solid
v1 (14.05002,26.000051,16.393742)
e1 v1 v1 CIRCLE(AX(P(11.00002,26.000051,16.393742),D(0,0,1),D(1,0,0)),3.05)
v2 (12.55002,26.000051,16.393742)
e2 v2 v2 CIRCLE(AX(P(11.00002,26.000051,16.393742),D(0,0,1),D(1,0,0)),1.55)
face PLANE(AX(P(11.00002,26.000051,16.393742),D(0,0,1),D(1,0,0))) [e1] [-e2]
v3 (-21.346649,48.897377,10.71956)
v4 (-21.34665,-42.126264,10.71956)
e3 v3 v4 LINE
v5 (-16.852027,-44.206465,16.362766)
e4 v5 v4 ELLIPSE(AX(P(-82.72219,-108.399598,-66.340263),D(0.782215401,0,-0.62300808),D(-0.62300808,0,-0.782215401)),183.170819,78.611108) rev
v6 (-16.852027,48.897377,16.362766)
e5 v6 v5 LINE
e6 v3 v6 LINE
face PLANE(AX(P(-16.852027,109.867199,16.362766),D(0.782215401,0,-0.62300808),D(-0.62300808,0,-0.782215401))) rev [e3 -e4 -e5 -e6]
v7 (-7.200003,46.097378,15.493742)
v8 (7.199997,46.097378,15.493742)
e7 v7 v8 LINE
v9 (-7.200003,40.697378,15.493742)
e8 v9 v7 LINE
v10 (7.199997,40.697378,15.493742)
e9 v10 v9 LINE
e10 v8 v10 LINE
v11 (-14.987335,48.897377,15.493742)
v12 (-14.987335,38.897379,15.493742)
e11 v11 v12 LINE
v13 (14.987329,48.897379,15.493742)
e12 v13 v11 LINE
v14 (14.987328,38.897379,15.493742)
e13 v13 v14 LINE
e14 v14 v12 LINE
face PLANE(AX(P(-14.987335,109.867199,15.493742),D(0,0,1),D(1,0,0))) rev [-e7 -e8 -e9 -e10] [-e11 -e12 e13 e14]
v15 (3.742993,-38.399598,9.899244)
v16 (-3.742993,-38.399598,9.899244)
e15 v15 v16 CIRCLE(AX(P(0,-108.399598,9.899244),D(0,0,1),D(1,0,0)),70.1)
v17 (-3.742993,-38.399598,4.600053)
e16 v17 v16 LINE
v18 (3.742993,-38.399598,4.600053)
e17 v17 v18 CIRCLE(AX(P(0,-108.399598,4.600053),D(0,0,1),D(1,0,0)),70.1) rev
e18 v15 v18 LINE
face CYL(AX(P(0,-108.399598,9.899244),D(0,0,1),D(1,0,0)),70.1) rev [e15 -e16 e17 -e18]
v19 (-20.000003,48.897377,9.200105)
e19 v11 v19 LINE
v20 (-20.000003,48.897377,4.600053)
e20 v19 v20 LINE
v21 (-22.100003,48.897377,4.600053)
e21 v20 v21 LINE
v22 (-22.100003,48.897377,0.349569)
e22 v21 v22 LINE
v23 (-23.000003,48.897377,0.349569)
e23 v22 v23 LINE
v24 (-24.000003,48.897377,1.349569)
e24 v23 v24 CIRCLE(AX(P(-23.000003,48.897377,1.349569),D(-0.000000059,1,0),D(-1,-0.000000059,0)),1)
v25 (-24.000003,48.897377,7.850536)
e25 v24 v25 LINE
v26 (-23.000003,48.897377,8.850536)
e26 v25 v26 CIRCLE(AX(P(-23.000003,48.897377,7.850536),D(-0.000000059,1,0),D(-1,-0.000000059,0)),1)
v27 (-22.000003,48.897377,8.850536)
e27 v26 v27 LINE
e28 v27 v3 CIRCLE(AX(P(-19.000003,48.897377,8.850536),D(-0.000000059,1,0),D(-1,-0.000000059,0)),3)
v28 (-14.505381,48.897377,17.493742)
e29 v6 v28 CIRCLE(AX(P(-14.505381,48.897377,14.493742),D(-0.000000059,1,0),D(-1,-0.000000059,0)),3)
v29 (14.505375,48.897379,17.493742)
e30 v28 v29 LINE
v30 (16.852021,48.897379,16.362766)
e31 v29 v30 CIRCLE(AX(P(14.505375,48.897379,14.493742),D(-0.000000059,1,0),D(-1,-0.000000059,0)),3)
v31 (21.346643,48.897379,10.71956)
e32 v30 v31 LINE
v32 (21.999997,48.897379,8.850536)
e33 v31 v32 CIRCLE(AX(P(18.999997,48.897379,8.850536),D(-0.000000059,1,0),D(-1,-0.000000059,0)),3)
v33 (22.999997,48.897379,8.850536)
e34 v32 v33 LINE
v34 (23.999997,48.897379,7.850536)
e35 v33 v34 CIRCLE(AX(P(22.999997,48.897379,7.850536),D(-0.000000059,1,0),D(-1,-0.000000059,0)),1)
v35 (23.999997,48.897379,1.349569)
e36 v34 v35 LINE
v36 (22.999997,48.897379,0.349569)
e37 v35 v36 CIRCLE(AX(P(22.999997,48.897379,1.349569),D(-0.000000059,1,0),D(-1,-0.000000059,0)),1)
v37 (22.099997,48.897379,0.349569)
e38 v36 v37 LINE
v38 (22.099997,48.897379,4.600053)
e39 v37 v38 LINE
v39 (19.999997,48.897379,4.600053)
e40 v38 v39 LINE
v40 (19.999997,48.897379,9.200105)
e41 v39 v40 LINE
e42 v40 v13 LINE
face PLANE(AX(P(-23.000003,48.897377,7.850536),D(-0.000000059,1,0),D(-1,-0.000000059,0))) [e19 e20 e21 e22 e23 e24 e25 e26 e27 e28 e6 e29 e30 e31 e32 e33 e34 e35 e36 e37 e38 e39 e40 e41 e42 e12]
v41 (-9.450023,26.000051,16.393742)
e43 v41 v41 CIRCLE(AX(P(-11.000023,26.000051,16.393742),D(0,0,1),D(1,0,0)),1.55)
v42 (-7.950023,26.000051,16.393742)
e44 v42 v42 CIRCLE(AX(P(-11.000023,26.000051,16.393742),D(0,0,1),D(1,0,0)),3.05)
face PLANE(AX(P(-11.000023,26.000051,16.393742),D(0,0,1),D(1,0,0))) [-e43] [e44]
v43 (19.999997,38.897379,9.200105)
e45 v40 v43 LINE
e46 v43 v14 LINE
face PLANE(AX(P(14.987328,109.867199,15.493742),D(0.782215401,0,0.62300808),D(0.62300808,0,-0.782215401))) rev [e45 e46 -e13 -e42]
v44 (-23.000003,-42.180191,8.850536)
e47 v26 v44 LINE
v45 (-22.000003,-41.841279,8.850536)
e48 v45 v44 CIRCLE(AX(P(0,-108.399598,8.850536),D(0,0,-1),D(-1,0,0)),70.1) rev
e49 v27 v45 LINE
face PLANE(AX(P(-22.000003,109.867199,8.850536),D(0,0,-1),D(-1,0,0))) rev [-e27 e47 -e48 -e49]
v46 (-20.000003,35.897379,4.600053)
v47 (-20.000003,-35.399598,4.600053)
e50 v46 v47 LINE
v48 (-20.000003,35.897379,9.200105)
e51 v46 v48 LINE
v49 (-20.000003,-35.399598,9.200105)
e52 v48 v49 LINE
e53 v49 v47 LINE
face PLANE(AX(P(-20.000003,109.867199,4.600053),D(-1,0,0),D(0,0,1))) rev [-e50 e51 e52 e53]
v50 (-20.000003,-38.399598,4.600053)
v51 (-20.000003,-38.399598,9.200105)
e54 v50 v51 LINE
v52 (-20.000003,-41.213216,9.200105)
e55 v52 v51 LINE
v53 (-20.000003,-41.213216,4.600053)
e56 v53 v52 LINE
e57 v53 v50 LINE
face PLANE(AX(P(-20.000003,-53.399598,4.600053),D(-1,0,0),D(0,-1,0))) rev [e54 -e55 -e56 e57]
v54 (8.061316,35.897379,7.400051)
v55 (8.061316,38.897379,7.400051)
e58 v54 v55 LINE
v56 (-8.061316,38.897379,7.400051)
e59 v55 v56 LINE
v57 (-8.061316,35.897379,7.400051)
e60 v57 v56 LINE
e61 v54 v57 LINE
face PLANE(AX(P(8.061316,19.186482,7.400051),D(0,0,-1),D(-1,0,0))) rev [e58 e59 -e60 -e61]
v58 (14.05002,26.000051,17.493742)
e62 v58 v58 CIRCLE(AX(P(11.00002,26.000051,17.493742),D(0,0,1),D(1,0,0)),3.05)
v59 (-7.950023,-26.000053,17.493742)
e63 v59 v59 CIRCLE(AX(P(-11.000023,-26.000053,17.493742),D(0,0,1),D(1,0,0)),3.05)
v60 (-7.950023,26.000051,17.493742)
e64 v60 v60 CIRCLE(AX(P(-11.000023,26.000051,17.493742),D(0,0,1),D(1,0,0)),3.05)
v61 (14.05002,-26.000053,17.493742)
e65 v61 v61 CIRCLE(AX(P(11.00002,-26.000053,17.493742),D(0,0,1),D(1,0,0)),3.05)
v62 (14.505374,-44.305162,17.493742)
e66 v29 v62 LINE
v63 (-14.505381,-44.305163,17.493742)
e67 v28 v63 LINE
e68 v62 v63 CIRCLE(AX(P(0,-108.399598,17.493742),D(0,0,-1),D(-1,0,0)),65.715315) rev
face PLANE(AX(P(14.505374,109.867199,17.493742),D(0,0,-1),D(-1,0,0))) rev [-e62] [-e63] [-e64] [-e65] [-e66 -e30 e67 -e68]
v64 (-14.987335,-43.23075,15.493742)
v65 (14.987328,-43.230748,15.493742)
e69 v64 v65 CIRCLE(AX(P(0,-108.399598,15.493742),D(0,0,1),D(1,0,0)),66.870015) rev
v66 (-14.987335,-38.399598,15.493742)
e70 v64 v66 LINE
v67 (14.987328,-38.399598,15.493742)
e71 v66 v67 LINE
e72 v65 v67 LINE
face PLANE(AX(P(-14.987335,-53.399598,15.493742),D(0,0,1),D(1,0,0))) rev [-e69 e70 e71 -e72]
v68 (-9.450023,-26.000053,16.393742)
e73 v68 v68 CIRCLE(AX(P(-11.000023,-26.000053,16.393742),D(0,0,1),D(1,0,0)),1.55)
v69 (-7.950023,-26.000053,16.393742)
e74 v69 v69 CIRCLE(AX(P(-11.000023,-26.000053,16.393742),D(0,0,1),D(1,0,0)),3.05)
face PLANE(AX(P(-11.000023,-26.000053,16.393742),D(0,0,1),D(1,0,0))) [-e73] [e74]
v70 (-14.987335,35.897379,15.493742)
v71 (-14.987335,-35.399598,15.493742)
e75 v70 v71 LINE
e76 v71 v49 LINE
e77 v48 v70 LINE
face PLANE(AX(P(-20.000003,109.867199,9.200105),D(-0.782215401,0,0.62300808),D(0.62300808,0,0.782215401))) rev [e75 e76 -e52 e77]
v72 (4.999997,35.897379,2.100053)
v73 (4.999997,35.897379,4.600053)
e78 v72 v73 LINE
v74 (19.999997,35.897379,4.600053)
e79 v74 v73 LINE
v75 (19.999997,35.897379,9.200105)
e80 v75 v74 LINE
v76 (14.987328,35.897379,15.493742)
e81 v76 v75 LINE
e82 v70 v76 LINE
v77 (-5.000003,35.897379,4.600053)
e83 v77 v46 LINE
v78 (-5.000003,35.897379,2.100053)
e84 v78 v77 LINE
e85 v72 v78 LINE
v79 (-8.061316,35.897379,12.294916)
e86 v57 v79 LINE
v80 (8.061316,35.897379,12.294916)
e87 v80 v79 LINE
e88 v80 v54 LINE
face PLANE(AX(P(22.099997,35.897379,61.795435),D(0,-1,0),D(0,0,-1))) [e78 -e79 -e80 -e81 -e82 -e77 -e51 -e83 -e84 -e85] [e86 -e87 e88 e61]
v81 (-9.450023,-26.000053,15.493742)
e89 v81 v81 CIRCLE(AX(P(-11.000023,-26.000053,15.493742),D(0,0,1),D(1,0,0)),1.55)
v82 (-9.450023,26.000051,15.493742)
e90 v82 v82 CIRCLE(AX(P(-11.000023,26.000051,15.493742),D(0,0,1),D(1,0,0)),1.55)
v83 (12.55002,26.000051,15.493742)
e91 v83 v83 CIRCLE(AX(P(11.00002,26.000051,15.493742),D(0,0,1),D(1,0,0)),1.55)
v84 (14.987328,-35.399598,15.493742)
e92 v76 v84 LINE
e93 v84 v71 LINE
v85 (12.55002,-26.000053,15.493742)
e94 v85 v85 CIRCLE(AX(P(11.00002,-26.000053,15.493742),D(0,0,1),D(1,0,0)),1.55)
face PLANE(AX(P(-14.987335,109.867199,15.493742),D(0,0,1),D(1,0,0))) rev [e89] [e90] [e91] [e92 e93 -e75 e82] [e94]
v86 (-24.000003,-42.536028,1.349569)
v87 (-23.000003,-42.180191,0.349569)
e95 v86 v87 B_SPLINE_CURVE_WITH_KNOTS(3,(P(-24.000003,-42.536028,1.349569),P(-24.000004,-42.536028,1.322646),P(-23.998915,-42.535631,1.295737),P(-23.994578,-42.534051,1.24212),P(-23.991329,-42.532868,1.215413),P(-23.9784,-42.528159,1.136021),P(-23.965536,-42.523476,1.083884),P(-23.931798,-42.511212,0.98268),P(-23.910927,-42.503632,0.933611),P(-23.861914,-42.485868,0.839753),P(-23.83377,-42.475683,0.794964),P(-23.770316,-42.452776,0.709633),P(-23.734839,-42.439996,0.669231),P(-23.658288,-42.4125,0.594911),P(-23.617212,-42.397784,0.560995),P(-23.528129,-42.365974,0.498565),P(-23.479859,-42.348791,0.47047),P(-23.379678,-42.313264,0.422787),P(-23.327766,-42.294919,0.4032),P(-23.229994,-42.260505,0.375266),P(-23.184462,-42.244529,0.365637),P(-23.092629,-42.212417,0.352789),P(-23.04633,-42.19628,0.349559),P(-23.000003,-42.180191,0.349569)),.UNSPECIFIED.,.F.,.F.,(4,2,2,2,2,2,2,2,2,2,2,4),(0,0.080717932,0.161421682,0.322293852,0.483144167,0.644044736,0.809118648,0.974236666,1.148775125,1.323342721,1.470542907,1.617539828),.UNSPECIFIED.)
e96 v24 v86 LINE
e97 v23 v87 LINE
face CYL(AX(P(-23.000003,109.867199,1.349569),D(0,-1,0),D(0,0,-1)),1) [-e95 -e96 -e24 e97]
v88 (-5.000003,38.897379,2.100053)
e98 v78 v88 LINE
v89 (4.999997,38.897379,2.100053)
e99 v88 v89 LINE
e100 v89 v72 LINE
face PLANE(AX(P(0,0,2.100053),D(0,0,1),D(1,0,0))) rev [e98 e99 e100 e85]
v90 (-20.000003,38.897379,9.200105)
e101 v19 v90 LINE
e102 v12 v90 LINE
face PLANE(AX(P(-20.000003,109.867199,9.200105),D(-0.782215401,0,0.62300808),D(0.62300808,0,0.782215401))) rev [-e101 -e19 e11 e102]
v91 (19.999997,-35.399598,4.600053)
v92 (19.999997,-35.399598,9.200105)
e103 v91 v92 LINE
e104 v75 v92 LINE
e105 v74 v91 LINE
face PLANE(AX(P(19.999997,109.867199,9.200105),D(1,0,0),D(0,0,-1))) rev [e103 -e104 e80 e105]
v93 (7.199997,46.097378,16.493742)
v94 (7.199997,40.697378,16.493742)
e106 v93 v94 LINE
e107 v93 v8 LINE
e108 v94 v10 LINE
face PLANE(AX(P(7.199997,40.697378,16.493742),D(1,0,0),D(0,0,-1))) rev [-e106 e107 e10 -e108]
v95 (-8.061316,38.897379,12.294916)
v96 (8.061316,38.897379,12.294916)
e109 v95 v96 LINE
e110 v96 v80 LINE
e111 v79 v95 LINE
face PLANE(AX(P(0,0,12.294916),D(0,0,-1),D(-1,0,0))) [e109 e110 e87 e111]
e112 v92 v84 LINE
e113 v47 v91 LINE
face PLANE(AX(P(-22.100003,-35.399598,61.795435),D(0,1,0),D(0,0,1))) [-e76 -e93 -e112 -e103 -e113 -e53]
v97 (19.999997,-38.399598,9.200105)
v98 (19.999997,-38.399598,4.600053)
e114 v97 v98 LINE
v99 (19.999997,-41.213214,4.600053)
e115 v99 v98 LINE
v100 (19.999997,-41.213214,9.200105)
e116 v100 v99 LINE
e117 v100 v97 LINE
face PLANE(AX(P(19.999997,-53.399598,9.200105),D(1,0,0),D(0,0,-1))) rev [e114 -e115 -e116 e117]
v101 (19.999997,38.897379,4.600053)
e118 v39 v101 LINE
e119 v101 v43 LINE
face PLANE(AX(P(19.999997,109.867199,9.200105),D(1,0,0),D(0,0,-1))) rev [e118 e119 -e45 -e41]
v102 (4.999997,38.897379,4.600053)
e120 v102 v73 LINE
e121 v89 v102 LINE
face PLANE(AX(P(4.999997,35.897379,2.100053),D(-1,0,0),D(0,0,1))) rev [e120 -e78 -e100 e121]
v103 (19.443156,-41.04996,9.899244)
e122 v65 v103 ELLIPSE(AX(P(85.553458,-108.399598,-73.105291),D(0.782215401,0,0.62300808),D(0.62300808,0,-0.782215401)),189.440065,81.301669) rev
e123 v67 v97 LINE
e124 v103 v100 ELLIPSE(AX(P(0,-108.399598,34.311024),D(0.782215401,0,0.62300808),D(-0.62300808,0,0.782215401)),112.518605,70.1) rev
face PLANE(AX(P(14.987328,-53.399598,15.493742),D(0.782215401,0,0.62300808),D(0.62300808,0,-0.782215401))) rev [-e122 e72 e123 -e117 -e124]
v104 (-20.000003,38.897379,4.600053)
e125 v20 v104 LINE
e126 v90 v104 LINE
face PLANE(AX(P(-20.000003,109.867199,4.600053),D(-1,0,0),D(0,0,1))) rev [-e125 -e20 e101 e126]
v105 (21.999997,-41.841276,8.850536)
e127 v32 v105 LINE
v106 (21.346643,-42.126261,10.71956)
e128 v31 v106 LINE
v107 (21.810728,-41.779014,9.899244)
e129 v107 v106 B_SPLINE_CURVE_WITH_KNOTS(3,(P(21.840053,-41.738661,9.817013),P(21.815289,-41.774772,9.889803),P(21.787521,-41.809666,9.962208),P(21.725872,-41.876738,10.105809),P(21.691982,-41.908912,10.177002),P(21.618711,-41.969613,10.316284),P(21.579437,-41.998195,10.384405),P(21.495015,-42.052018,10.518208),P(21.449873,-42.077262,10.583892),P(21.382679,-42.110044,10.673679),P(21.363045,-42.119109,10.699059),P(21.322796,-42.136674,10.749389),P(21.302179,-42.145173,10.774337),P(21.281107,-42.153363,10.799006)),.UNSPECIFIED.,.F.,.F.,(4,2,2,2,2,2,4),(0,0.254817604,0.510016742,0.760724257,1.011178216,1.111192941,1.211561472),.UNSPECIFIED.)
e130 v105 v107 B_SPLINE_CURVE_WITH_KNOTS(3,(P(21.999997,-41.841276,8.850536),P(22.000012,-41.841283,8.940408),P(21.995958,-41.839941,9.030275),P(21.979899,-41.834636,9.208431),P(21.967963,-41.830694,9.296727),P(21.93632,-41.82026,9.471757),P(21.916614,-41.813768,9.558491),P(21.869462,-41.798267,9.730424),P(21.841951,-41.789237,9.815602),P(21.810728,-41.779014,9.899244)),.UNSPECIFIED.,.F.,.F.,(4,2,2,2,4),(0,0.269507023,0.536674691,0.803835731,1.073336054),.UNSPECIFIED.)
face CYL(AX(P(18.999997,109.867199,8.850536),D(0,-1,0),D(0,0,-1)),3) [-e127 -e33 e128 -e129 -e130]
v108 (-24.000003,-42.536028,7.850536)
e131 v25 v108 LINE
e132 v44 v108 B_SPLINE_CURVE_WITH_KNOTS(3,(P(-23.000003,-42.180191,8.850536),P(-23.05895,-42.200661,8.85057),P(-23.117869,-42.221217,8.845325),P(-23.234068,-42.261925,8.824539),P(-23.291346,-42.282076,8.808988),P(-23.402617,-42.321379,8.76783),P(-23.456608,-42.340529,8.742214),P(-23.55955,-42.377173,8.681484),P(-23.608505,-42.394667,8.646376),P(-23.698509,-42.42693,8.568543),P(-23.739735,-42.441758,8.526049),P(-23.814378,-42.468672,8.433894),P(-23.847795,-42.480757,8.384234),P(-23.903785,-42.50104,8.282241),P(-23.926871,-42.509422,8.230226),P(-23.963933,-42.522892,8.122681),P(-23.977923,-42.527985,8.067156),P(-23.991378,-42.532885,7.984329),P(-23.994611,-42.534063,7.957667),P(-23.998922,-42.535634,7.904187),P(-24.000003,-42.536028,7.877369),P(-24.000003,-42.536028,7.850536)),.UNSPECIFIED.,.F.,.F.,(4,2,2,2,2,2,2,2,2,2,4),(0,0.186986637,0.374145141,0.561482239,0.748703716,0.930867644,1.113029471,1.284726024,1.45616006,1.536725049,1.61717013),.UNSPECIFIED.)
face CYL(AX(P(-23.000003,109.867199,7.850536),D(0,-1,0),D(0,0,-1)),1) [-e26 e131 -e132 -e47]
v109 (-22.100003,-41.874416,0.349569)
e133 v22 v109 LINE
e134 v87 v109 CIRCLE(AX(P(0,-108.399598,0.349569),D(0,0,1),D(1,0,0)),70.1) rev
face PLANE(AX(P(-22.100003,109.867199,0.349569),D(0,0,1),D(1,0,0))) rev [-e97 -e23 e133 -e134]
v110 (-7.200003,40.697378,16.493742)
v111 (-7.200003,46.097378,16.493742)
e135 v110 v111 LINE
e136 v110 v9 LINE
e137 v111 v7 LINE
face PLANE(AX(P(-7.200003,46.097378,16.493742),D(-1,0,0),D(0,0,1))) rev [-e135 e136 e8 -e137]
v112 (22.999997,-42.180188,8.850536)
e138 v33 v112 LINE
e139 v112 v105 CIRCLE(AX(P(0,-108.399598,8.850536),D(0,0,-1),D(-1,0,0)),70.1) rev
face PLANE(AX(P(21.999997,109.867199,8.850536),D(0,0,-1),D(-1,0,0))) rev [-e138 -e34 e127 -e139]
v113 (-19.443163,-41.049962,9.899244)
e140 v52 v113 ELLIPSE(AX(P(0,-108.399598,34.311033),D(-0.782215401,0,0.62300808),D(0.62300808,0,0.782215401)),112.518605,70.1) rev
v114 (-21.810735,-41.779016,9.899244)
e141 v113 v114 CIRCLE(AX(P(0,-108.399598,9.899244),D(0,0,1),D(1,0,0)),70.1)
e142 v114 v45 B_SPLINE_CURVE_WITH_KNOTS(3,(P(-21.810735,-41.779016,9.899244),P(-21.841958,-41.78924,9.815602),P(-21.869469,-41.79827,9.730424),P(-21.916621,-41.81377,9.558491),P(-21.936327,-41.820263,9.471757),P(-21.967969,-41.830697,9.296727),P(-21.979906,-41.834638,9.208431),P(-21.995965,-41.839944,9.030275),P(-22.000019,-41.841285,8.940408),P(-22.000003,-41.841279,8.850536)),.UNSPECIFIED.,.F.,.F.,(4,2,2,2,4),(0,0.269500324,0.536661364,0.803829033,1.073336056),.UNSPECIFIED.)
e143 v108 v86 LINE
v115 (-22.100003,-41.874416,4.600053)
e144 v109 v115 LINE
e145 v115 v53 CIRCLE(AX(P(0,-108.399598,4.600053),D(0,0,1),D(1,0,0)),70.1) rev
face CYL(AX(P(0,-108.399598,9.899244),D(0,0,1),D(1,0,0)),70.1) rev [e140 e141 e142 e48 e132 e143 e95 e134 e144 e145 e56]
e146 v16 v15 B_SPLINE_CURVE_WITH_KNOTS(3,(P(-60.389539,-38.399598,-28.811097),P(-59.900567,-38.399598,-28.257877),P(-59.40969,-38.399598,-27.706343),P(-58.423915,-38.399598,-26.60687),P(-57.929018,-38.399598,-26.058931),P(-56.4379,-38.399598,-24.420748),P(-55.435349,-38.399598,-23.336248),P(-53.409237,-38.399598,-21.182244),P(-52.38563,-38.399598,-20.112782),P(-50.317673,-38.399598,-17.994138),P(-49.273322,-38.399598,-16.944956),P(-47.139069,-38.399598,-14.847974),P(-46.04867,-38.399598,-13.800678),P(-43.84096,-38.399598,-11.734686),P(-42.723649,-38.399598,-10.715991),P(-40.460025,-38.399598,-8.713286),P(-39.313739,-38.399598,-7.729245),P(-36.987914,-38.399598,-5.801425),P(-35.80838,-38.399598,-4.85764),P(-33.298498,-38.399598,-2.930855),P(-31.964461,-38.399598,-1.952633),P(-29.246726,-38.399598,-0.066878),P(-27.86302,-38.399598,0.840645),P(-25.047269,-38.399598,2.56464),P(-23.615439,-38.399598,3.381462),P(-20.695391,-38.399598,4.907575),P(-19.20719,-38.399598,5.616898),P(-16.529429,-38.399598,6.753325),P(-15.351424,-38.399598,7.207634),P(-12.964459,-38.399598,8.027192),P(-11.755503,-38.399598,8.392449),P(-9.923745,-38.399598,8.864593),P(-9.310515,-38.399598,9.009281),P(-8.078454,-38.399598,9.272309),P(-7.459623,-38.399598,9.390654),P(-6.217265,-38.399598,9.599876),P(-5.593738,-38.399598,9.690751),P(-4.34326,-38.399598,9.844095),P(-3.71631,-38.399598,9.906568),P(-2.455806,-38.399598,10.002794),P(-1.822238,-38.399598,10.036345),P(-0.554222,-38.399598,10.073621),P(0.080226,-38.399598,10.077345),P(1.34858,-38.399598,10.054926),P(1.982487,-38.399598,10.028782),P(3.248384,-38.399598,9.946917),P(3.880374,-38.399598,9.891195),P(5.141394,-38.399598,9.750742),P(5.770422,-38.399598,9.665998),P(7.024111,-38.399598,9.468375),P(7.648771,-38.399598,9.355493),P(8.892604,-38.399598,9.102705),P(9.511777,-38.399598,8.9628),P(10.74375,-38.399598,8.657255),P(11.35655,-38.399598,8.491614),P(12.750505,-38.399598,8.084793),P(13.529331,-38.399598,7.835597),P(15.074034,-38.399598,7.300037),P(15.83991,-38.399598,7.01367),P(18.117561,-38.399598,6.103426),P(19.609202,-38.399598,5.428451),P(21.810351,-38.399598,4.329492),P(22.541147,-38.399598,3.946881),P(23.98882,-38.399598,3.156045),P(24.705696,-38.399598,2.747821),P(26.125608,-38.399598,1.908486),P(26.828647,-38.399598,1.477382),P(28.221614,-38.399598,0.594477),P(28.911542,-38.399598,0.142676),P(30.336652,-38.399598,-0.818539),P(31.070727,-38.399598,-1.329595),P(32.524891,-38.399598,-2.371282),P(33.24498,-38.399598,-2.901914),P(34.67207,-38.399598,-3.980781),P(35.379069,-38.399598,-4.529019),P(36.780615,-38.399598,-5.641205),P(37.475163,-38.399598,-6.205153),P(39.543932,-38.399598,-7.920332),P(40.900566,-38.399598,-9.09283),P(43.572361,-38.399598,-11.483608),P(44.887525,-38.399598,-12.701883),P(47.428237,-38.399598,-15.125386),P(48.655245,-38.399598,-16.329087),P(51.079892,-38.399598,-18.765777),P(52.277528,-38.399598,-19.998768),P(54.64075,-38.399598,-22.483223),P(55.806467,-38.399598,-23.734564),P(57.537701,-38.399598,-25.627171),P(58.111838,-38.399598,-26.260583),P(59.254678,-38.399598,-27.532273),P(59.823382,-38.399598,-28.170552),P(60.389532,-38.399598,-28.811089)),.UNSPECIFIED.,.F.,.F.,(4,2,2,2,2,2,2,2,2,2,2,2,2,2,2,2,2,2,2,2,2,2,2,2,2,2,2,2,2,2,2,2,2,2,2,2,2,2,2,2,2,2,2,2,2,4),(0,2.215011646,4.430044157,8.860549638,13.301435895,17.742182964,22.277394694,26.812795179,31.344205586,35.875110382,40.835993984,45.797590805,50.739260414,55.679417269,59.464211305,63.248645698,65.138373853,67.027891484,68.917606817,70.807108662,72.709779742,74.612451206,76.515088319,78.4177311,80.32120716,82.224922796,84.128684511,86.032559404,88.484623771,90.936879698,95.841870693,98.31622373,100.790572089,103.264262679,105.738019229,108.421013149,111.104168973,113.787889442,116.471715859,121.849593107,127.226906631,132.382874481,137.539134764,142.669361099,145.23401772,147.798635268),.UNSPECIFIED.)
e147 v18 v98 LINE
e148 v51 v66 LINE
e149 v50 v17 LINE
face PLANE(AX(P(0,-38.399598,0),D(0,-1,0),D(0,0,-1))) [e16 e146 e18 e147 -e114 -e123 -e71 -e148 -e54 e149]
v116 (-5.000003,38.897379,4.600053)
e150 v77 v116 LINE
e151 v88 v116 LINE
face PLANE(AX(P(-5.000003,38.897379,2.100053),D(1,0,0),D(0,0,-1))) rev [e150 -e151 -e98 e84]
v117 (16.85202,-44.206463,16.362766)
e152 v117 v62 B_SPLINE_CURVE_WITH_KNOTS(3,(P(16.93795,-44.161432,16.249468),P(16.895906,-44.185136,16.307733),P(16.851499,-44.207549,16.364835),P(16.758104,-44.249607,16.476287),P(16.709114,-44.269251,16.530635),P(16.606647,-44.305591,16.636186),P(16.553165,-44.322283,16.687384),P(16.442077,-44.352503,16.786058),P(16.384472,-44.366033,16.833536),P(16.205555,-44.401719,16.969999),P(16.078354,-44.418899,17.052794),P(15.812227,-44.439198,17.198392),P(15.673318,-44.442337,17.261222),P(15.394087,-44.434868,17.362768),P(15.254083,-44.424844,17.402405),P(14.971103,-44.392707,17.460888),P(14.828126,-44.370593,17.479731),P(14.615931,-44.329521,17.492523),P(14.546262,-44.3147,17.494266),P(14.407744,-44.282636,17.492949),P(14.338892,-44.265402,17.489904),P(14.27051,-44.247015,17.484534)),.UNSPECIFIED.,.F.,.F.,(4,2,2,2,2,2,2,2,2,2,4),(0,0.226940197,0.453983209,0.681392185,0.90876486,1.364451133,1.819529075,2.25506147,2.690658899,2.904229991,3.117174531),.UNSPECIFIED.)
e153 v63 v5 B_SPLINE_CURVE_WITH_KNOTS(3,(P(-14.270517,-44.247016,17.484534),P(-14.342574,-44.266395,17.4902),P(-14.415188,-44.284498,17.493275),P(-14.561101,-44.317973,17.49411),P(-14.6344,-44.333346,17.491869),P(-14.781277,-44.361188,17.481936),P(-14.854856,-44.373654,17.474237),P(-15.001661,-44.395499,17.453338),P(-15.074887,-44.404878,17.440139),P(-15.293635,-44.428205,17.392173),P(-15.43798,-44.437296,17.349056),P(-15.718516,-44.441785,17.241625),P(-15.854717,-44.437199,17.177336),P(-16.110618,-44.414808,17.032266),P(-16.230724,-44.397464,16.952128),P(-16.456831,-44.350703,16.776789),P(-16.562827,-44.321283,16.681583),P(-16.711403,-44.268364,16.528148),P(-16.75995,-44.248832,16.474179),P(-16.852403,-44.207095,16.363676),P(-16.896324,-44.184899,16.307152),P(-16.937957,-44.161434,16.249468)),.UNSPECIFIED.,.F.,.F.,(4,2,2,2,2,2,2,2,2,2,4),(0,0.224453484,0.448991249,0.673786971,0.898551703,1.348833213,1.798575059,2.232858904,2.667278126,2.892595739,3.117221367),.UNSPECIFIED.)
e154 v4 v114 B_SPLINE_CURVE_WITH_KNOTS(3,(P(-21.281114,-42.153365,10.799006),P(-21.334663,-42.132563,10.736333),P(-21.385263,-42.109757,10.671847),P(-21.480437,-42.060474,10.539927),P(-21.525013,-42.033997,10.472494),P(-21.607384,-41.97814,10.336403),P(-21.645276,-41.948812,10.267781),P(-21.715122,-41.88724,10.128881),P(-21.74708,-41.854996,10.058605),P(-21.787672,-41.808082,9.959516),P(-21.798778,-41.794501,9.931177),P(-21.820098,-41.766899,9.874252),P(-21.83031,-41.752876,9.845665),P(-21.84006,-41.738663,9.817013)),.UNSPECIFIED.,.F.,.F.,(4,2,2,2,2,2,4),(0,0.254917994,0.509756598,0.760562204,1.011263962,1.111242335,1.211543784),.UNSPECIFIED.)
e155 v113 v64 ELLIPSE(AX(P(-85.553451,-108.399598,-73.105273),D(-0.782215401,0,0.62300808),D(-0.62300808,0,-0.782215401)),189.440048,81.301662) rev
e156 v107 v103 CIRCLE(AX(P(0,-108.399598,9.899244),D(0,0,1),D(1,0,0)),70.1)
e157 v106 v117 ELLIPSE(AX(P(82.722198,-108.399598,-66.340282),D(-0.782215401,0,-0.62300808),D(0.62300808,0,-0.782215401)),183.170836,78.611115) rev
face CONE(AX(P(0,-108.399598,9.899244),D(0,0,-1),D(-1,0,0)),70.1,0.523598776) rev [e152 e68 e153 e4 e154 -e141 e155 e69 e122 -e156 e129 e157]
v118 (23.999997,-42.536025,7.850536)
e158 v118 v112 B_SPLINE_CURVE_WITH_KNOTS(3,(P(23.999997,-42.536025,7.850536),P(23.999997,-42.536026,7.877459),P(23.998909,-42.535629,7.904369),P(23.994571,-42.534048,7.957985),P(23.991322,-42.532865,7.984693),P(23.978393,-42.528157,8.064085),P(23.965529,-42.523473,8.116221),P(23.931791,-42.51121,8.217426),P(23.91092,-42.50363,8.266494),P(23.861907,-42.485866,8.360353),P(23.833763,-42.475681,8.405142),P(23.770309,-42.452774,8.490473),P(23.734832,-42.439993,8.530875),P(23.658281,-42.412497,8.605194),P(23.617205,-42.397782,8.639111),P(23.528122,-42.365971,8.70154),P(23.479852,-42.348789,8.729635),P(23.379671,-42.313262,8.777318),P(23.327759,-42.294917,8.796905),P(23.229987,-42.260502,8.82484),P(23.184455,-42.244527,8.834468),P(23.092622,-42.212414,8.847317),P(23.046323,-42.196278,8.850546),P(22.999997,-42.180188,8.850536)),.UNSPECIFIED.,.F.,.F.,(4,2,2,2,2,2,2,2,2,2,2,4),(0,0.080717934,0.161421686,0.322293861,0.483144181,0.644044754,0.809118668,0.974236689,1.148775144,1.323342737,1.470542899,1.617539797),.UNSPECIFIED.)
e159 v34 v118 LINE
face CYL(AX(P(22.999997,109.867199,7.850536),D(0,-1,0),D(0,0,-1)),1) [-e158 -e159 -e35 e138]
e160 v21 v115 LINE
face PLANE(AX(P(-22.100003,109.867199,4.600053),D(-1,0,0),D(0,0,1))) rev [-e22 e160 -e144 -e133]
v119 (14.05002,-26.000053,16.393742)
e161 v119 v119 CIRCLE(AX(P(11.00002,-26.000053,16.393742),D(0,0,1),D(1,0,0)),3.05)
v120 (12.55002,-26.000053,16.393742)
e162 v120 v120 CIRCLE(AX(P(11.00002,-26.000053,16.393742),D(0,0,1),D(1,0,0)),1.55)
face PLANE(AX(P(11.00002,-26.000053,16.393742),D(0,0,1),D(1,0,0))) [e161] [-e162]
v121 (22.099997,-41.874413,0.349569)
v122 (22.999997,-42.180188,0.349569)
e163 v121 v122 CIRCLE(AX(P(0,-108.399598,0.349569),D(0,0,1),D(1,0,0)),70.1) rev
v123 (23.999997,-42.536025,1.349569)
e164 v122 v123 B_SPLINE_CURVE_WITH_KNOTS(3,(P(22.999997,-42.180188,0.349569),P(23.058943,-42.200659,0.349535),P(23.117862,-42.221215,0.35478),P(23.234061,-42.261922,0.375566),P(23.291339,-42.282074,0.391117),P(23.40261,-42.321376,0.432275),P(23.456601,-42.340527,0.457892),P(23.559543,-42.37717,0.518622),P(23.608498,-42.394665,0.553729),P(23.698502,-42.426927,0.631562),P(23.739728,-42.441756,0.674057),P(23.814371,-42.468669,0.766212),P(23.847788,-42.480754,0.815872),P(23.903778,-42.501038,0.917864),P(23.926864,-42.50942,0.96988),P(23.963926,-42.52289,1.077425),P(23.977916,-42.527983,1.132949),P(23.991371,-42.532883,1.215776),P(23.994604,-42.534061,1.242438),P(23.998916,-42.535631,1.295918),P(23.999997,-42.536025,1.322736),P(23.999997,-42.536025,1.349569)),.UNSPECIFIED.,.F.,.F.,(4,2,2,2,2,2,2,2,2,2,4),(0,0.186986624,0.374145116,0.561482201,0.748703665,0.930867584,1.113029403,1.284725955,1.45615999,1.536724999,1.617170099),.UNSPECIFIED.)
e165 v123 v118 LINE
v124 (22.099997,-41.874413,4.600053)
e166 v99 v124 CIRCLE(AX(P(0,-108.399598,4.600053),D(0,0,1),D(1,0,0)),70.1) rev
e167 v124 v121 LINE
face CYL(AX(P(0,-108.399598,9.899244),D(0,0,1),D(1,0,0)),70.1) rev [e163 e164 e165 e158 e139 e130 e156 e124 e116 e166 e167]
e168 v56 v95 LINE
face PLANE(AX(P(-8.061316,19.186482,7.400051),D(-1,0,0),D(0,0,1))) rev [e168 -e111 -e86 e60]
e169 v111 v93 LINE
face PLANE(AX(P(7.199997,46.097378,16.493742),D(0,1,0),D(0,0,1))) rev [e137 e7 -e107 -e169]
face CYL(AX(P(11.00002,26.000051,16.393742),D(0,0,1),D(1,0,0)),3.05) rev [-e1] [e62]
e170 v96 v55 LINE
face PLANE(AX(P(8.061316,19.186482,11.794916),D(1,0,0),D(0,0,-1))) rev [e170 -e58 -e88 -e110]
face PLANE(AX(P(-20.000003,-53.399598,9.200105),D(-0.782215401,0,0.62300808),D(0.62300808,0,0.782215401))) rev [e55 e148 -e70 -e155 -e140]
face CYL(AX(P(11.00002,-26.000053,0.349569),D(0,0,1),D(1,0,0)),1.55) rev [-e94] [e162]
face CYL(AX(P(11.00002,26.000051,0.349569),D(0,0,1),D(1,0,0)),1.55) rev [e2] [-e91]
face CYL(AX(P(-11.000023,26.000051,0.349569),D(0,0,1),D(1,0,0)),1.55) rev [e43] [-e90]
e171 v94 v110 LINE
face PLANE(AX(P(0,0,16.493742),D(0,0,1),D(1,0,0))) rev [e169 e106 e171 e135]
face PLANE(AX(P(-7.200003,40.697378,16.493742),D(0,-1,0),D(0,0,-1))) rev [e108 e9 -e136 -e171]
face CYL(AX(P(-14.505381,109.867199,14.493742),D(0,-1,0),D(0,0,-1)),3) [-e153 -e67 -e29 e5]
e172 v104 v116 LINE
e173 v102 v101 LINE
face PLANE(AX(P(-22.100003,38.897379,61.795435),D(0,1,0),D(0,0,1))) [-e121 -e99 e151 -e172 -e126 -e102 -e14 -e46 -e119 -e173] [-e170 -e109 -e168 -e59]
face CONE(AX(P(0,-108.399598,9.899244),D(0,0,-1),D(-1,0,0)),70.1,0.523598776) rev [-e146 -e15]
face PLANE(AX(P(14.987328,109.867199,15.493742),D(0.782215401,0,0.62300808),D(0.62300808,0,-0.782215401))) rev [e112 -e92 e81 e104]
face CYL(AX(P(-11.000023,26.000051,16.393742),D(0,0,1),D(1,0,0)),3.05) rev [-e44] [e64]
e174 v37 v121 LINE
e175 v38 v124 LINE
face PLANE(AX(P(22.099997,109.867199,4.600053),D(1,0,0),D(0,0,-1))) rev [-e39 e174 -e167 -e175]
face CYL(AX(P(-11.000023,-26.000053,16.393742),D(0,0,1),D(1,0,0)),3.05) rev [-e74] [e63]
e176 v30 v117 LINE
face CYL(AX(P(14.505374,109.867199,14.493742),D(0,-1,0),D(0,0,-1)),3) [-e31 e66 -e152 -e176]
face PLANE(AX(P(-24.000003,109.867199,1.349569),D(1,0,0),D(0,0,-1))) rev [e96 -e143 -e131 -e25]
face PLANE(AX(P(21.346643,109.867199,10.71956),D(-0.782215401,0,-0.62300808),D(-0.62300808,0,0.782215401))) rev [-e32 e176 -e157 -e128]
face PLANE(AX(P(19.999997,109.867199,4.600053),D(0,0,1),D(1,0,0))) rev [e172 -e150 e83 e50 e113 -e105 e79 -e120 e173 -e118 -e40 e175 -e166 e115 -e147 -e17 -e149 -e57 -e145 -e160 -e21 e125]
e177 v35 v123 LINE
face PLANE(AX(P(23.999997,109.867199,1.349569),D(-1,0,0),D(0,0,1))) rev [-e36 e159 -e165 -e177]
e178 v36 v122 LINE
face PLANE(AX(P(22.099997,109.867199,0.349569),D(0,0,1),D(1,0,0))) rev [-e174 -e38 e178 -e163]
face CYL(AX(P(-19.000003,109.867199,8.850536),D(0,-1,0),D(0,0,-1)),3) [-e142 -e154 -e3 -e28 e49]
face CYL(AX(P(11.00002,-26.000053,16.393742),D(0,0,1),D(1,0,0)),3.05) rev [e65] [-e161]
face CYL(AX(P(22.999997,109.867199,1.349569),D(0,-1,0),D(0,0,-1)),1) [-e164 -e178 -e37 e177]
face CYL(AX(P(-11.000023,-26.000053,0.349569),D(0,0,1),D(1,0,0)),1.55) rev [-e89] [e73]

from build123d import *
from OCP.BRepAlgoAPI import BRepAlgoAPI_Cut
from OCP.TopTools import TopTools_ListOfShape

# Parameters (mm, degrees)
EXTRUDE_1_DEPTH     = 58.89737674
EXTRUDE_START       = 38.399597665
EXTRUDE_2_DEPTH     = 38.399597665
EXTRUDE_3_REACH     = 66.893
SKETCH_3_W          = 44.2
SKETCH_3_H          = 3
EXTRUDE_4_REACH     = 66.893
SKETCH_4_W          = 44.2
SKETCH_4_H          = 3
CUT_EXTRUDE_START   = -77.29697691
CUT_EXTRUDE_1_DEPTH = 77.29697691
SKETCH_6_W          = 16.122631446
SKETCH_6_H          = 4.394864928
CUT_EXTRUDE_2_DEPTH = 3
EXTRUDE_START_2     = 15
EXTRUDE_5_DEPTH     = 15
SKETCH_11_R         = 3.05
CUT_EXTRUDE_4_DEPTH = 1.1
CUT_EXTRUDE_START_2 = -10
CUT_EXTRUDE_5_DEPTH = 10
SKETCH_14_R         = 1.55
CUT_EXTRUDE_6_DEPTH = 57.783530783
SKETCH_15_W         = 16.122631446
SKETCH_15_H         = 3
CUT_EXTRUDE_7_DEPTH = 0.5
SKETCH_16_W         = 10
SKETCH_16_H         = 3
EXTRUDE_6_DEPTH     = 2.5
SKETCH_17_W         = 14.4
SKETCH_17_H         = 5.4
CUT_EXTRUDE_8_DEPTH = 1


with BuildPart() as part:
    # 草图1 → 凸台-拉伸1 (new body)
    with BuildSketch(Plane(origin=(0, 0, 0), x_dir=(1, 0, 0), z_dir=(0, 1, 0))):
        with BuildLine():
            Line((21.346642729, -10.719560241), (16.852020459, -16.362765964))
            ThreePointArc((16.852020459, -16.362765964), (15.807857901, -17.196247295), (14.505374257, -17.493741725))
            Line((14.505374257, -17.493741725), (-14.505381202, -17.493741725))
            ThreePointArc((-14.505381202, -17.493741725), (-15.807864846, -17.196247295), (-16.852027404, -16.362765964))
            Line((-16.852027404, -16.362765964), (-21.346649674, -10.719560241))
            ThreePointArc((-21.346649674, -10.719560241), (-21.831958504, -9.840501001), (-22.000003473, -8.850536003))
            Line((-22.000003473, -8.850536003), (-23.000003473, -8.850536003))
            ThreePointArc((-23.000003473, -8.850536003), (-23.707110254, -8.557642784), (-24.000003473, -7.850536003))
            Line((-24.000003473, -7.850536003), (-24.000003473, -1.349569462))
            ThreePointArc((-24.000003473, -1.349569462), (-23.707110254, -0.642462681), (-23.000003473, -0.349569462))
            Line((-23.000003473, -0.349569462), (-22.100003473, -0.349569462))
            Line((-22.100003473, -0.349569462), (-22.100003473, -4.600052733))
            Line((-22.100003473, -4.600052733), (-22.000003473, -4.600052733))
            Line((-22.000003473, -4.600052733), (-20.000003473, -4.600052733))
            Line((-20.000003473, -4.600052733), (-20.000003473, -9.200105465))
            Line((-20.000003473, -9.200105465), (-14.987335304, -15.493741725))
            Line((-14.987335304, -15.493741725), (14.987328359, -15.493741725))
            Line((14.987328359, -15.493741725), (19.999996527, -9.200105465))
            Line((19.999996527, -9.200105465), (19.999996527, -4.600052733))
            Line((19.999996527, -4.600052733), (21.999996527, -4.600052733))
            Line((21.999996527, -4.600052733), (22.099996527, -4.600052733))
            Line((22.099996527, -4.600052733), (22.099996527, -0.349569462))
            Line((22.099996527, -0.349569462), (22.999996527, -0.349569462))
            ThreePointArc((22.999996527, -0.349569462), (23.707103309, -0.642462681), (23.999996527, -1.349569462))
            Line((23.999996527, -1.349569462), (23.999996527, -7.850536003))
            ThreePointArc((23.999996527, -7.850536003), (23.707103309, -8.557642784), (22.999996527, -8.850536003))
            Line((22.999996527, -8.850536003), (21.999996527, -8.850536003))
            ThreePointArc((21.999996527, -8.850536003), (21.831951559, -9.840501001), (21.346642729, -10.719560241))
        make_face()
    extrude(amount=EXTRUDE_1_DEPTH)

    # 草图2 → 凸台-拉伸2 (add)
    with BuildSketch(Plane.XZ.offset(EXTRUDE_START)):
        with BuildLine():
            Line((22.999996527, 8.850536003), (21.999996527, 8.850536003))
            ThreePointArc((21.999996527, 8.850536003), (21.831951559, 9.840501001), (21.346642729, 10.719560241))
            Line((21.346642729, 10.719560241), (16.852020459, 16.362765964))
            ThreePointArc((16.852020459, 16.362765964), (15.807857901, 17.196247295), (14.505374257, 17.493741725))
            Line((14.505374257, 17.493741725), (-14.505381202, 17.493741725))
            ThreePointArc((-14.505381202, 17.493741725), (-15.807864846, 17.196247295), (-16.852027404, 16.362765964))
            Line((-16.852027404, 16.362765964), (-21.346649674, 10.719560241))
            ThreePointArc((-21.346649674, 10.719560241), (-21.831958504, 9.840501001), (-22.000003473, 8.850536003))
            Line((-22.000003473, 8.850536003), (-23.000003473, 8.850536003))
            ThreePointArc((-23.000003473, 8.850536003), (-23.707110254, 8.557642784), (-24.000003473, 7.850536003))
            Line((-24.000003473, 7.850536003), (-24.000003473, 1.349569462))
            ThreePointArc((-24.000003473, 1.349569462), (-23.707110254, 0.642462681), (-23.000003473, 0.349569462))
            Line((-23.000003473, 0.349569462), (-22.100003473, 0.349569462))
            Line((-22.100003473, 0.349569462), (-22.100003473, 4.600052733))
            Line((-22.100003473, 4.600052733), (-20.000003473, 4.600052733))
            Line((-20.000003473, 4.600052733), (-20.000003473, 9.200105465))
            Line((-20.000003473, 9.200105465), (-14.987335304, 15.493741725))
            Line((-14.987335304, 15.493741725), (14.987328359, 15.493741725))
            Line((14.987328359, 15.493741725), (19.999996527, 9.200105465))
            Line((19.999996527, 9.200105465), (19.999996527, 4.600052733))
            Line((19.999996527, 4.600052733), (22.099996527, 4.600052733))
            Line((22.099996527, 4.600052733), (22.099996527, 0.349569462))
            Line((22.099996527, 0.349569462), (22.999996527, 0.349569462))
            ThreePointArc((22.999996527, 0.349569462), (23.707103309, 0.642462681), (23.999996527, 1.349569462))
            Line((23.999996527, 1.349569462), (23.999996527, 7.850536003))
            ThreePointArc((23.999996527, 7.850536003), (23.707103309, 8.557642784), (22.999996527, 8.850536003))
        make_face()
    extrude(amount=-EXTRUDE_2_DEPTH)

    # 凸台-拉伸3: up to this face of the body (flat: up to its plane)
    extrude_3_end = Plane(part.part.faces().sort_by_distance((-3.473e-06, 10.248889538, 17.493741725))[0])
    # 草图3 → 凸台-拉伸3 (add, up to the picked face)
    with BuildSketch(Plane(origin=(0, 0, 4.600052733), x_dir=(-1, 0, 0), z_dir=(0, 0, -1)), mode=Mode.PRIVATE) as extrude_3_sk1:
        with Locations((3.473e-06, -36.899597665)):
            Rectangle(SKETCH_3_W, SKETCH_3_H)
    extrude_3_tool1 = split(extrude(extrude_3_sk1.sketch, amount=-EXTRUDE_3_REACH, mode=Mode.PRIVATE), bisect_by=extrude_3_end, keep=Keep.BOTH, mode=Mode.PRIVATE)
    add(extrude_3_tool1.solids().sort_by(Axis((-3e-06, -36.899598, 4.600053), (0, 0, 1)))[0])

    # 凸台-拉伸4: up to this face of the body (flat: up to its plane)
    extrude_4_end = Plane(part.part.faces().sort_by_distance((-3.473e-06, 9.499837909, 17.493741725))[0])
    # 草图4 → 凸台-拉伸4 (add, up to the picked face)
    with BuildSketch(Plane(origin=(0, 0, 4.600052733), x_dir=(-1, 0, 0), z_dir=(0, 0, -1)), mode=Mode.PRIVATE) as extrude_4_sk1:
        with Locations((3.473e-06, 37.397379245)):
            Rectangle(SKETCH_4_W, SKETCH_4_H)
    extrude_4_tool1 = split(extrude(extrude_4_sk1.sketch, amount=-EXTRUDE_4_REACH, mode=Mode.PRIVATE), bisect_by=extrude_4_end, keep=Keep.BOTH, mode=Mode.PRIVATE)
    add(extrude_4_tool1.solids().sort_by(Axis((-3e-06, 37.397379, 4.600053), (0, 0, 1)))[0])

    # 草图5 → 切除-拉伸1 (cut)
    with BuildSketch(Plane(origin=(0, 38.897379245, 0), x_dir=(1, 0, 0), z_dir=(0, 1, 0)).offset(CUT_EXTRUDE_START)):
        with BuildLine():
            Line((-22.100003473, -8.850536003), (-22.100003473, -17.493741725))
            Line((-22.100003473, -17.493741725), (-14.505381202, -17.493741725))
            ThreePointArc((-14.505381202, -17.493741725), (-15.807864846, -17.196247295), (-16.852027404, -16.362765964))
            Line((-16.852027404, -16.362765964), (-21.346649674, -10.719560241))
            ThreePointArc((-21.346649674, -10.719560241), (-21.831958504, -9.840501001), (-22.000003473, -8.850536003))
            Line((-22.000003473, -8.850536003), (-22.100003473, -8.850536003))
        make_face()
        with BuildLine():
            Line((14.505374257, -17.493741725), (22.099996527, -17.493741725))
            Line((22.099996527, -17.493741725), (22.099996527, -8.850536003))
            Line((22.099996527, -8.850536003), (21.999996527, -8.850536003))
            ThreePointArc((21.999996527, -8.850536003), (21.831951559, -9.840501001), (21.346642729, -10.719560241))
            Line((21.346642729, -10.719560241), (16.852020459, -16.362765964))
            ThreePointArc((16.852020459, -16.362765964), (15.807857901, -17.196247295), (14.505374257, -17.493741725))
        make_face()
    extrude(amount=CUT_EXTRUDE_1_DEPTH, mode=Mode.SUBTRACT)

    # 草图6 → 切除-拉伸2 (cut)
    with BuildSketch(Plane(origin=(0, 38.897379245, 0), x_dir=(1, 0, 0), z_dir=(0, 1, 0))):
        with Locations((0, -9.597483264)):
            Rectangle(SKETCH_6_W, SKETCH_6_H)
    extrude(amount=-CUT_EXTRUDE_2_DEPTH, mode=Mode.SUBTRACT)

    # 草图7 → 凸台-拉伸5 (add)
    with BuildSketch(Plane(origin=(0, -38.399597665, 0), x_dir=(-1, 0, 0), z_dir=(0, -1, 0)).offset(EXTRUDE_START_2)):
        with BuildLine():
            Line((20.000003473, -4.600052733), (20.000003473, -9.200105465))
            Line((20.000003473, -9.200105465), (14.987335304, -15.493741725))
            Line((14.987335304, -15.493741725), (-14.987328359, -15.493741725))
            Line((-14.987328359, -15.493741725), (-19.999996527, -9.200105465))
            Line((-19.999996527, -9.200105465), (-19.999996527, -4.600052733))
            Line((-19.999996527, -4.600052733), (-21.999996527, -4.600052733))
            Line((-21.999996527, -4.600052733), (-22.099996527, -4.600052733))
            Line((-22.099996527, -4.600052733), (-22.099996527, -0.349569462))
            Line((-22.099996527, -0.349569462), (-22.999996527, -0.349569462))
            ThreePointArc((-22.999996527, -0.349569462), (-23.707103309, -0.642462681), (-23.999996527, -1.349569462))
            Line((-23.999996527, -1.349569462), (-23.999996527, -7.850536003))
            ThreePointArc((-23.999996527, -7.850536003), (-23.707103309, -8.557642784), (-22.999996527, -8.850536003))
            Line((-22.999996527, -8.850536003), (-21.999996527, -8.850536003))
            ThreePointArc((-21.999996527, -8.850536003), (-21.831951559, -9.840501001), (-21.346642729, -10.719560241))
            Line((-21.346642729, -10.719560241), (-16.852020459, -16.362765964))
            ThreePointArc((-16.852020459, -16.362765964), (-15.807857901, -17.196247295), (-14.505374257, -17.493741725))
            Line((-14.505374257, -17.493741725), (14.505381202, -17.493741725))
            ThreePointArc((14.505381202, -17.493741725), (15.807864846, -17.196247295), (16.852027404, -16.362765964))
            Line((16.852027404, -16.362765964), (21.346649674, -10.719560241))
            ThreePointArc((21.346649674, -10.719560241), (21.831958504, -9.840501001), (22.000003473, -8.850536003))
            Line((22.000003473, -8.850536003), (23.000003473, -8.850536003))
            ThreePointArc((23.000003473, -8.850536003), (23.707110254, -8.557642784), (24.000003473, -7.850536003))
            Line((24.000003473, -7.850536003), (24.000003473, -1.349569462))
            ThreePointArc((24.000003473, -1.349569462), (23.707110254, -0.642462681), (23.000003473, -0.349569462))
            Line((23.000003473, -0.349569462), (22.100003473, -0.349569462))
            Line((22.100003473, -0.349569462), (22.100003473, -4.600052733))
            Line((22.100003473, -4.600052733), (22.000003473, -4.600052733))
            Line((22.000003473, -4.600052733), (20.000003473, -4.600052733))
        make_face()
    extrude(amount=-EXTRUDE_5_DEPTH)

    # 草图8 → 切除-旋转1 (revolve, cut)
    with BuildSketch(Plane(origin=(0, 0, 0), x_dir=(0, 0, -1), z_dir=(1, 0, 0))):
        Polygon((-9.89924439, -38.299597665), (-20.291549236, -44.299597665), (-20.291549236, -55.801852499), (11.09144377, -55.801852499), (11.09144377, -44.299597665), (0.699138925, -38.299597665), align=None)
    revolve(axis=Axis((0, -108.399597665, 9.89924439), (0, 0, -1)), mode=Mode.SUBTRACT)

    # 草图11 → 切除-拉伸4 (cut)
    with BuildSketch(Plane.XY.offset(17.493741725)):
        with Locations((-11.00002286, 26.0000508)):
            Circle(SKETCH_11_R)
        with Locations((11.00002032, 26.0000508)):
            Circle(SKETCH_11_R)
        with Locations((-11.00002286, -26.00005334)):
            Circle(SKETCH_11_R)
        with Locations((11.00002032, -26.00005334)):
            Circle(SKETCH_11_R)
    extrude(amount=-CUT_EXTRUDE_4_DEPTH, mode=Mode.SUBTRACT)


with BuildPart() as cut_extrude_5_tool:
    # 草图13 → 切除-拉伸5 (new body)
    with BuildSketch(Plane(origin=(-3.473e-06, 58.897378066, 0), x_dir=(0.9999999999999983, 5.895855893701837e-08, 0), z_dir=(-5.895855893701837e-08, 0.9999999999999983, 0)).offset(CUT_EXTRUDE_START_2)):
        with BuildLine():
            Line((-23, -8.850536003), (-22, -8.850536003))
            ThreePointArc((-22, -8.850536003), (-21.831955032, -9.840501001), (-21.346646202, -10.719560241))
            Line((-21.346646202, -10.719560241), (-16.852023931, -16.362765964))
            ThreePointArc((-16.852023931, -16.362765964), (-15.807861373, -17.196247295), (-14.50537773, -17.493741725))
            Line((-14.50537773, -17.493741725), (14.50537773, -17.493741725))
            ThreePointArc((14.50537773, -17.493741725), (15.807861373, -17.196247295), (16.852023931, -16.362765964))
            Line((16.852023931, -16.362765964), (21.346646202, -10.719560241))
            ThreePointArc((21.346646202, -10.719560241), (21.831955032, -9.840501001), (22, -8.850536003))
            Line((22, -8.850536003), (23, -8.850536003))
            ThreePointArc((23, -8.850536003), (23.707106781, -8.557642784), (24, -7.850536003))
            Line((24, -7.850536003), (24, -1.349569462))
            ThreePointArc((24, -1.349569462), (23.707106781, -0.642462681), (23, -0.349569462))
            Line((23, -0.349569462), (22.1, -0.349569462))
            Line((22.1, -0.349569462), (22.1, -4.600052733))
            Line((22.1, -4.600052733), (20, -4.600052733))
            Line((20, -4.600052733), (20, -9.200105465))
            Line((20, -9.200105465), (14.987331831, -15.493741725))
            Line((14.987331831, -15.493741725), (-14.987331831, -15.493741725))
            Line((-14.987331831, -15.493741725), (-20, -9.200105465))
            Line((-20, -9.200105465), (-20, -4.600052733))
            Line((-20, -4.600052733), (-22.1, -4.600052733))
            Line((-22.1, -4.600052733), (-22.1, -0.349569462))
            Line((-22.1, -0.349569462), (-23, -0.349569462))
            ThreePointArc((-23, -0.349569462), (-23.707106781, -0.642462681), (-24, -1.349569462))
            Line((-24, -1.349569462), (-24, -7.850536003))
            ThreePointArc((-24, -7.850536003), (-23.707106781, -8.557642784), (-23, -8.850536003))
        make_face()
    extrude(amount=CUT_EXTRUDE_5_DEPTH)


with BuildPart() as part_1:
    add(part.part)

    # 切除-拉伸5: cut by cut_extrude_5_tool, with a tolerance
    cut_extrude_5_stock = TopTools_ListOfShape()
    cut_extrude_5_stock.Append(part_1.part.wrapped)
    cut_extrude_5_tools = TopTools_ListOfShape()
    cut_extrude_5_tools.Append(cut_extrude_5_tool.part.wrapped)
    cut_extrude_5_cut = BRepAlgoAPI_Cut()
    cut_extrude_5_cut.SetArguments(cut_extrude_5_stock)
    cut_extrude_5_cut.SetTools(cut_extrude_5_tools)
    cut_extrude_5_cut.SetFuzzyValue(0.00001)
    cut_extrude_5_cut.Build()
    add(Compound.cast(cut_extrude_5_cut.Shape()).solids(), mode=Mode.REPLACE)

    # 草图14 → 切除-拉伸6 (cut, through all)
    with BuildSketch(Plane.XY.offset(16.393741725)):
        with Locations((-11.00002286, 26.0000508)):
            Circle(SKETCH_14_R)
        with Locations((11.00002032, 26.0000508)):
            Circle(SKETCH_14_R)
        with Locations((-11.00002286, -26.00005334)):
            Circle(SKETCH_14_R)
        with Locations((11.00002032, -26.00005334)):
            Circle(SKETCH_14_R)
    extrude(amount=-CUT_EXTRUDE_6_DEPTH, mode=Mode.SUBTRACT)

    # 草图15 → 切除-拉伸7 (cut)
    with BuildSketch(Plane(origin=(0, 0, 11.794915728), x_dir=(-1, 0, 0), z_dir=(0, 0, -1))):
        with Locations((0, 37.397379245)):
            Rectangle(SKETCH_15_W, SKETCH_15_H)
    extrude(amount=-CUT_EXTRUDE_7_DEPTH, mode=Mode.SUBTRACT)

    # 草图16 → 凸台-拉伸6 (add)
    with BuildSketch(Plane(origin=(0, 0, 4.600052733), x_dir=(-1, 0, 0), z_dir=(0, 0, -1))):
        with Locations((3.473e-06, 37.397379245)):
            Rectangle(SKETCH_16_W, SKETCH_16_H)
    extrude(amount=EXTRUDE_6_DEPTH)

    # 草图17 → 切除-拉伸8 (cut)
    with BuildSketch(Plane(origin=(0, 0, 15.493741725), x_dir=(-1, 0, 0), z_dir=(0, 0, -1))):
        with Locations((2.883e-06, 43.397377654)):
            Rectangle(SKETCH_17_W, SKETCH_17_H)
    extrude(amount=-CUT_EXTRUDE_8_DEPTH, mode=Mode.SUBTRACT)


solid = part_1.part
